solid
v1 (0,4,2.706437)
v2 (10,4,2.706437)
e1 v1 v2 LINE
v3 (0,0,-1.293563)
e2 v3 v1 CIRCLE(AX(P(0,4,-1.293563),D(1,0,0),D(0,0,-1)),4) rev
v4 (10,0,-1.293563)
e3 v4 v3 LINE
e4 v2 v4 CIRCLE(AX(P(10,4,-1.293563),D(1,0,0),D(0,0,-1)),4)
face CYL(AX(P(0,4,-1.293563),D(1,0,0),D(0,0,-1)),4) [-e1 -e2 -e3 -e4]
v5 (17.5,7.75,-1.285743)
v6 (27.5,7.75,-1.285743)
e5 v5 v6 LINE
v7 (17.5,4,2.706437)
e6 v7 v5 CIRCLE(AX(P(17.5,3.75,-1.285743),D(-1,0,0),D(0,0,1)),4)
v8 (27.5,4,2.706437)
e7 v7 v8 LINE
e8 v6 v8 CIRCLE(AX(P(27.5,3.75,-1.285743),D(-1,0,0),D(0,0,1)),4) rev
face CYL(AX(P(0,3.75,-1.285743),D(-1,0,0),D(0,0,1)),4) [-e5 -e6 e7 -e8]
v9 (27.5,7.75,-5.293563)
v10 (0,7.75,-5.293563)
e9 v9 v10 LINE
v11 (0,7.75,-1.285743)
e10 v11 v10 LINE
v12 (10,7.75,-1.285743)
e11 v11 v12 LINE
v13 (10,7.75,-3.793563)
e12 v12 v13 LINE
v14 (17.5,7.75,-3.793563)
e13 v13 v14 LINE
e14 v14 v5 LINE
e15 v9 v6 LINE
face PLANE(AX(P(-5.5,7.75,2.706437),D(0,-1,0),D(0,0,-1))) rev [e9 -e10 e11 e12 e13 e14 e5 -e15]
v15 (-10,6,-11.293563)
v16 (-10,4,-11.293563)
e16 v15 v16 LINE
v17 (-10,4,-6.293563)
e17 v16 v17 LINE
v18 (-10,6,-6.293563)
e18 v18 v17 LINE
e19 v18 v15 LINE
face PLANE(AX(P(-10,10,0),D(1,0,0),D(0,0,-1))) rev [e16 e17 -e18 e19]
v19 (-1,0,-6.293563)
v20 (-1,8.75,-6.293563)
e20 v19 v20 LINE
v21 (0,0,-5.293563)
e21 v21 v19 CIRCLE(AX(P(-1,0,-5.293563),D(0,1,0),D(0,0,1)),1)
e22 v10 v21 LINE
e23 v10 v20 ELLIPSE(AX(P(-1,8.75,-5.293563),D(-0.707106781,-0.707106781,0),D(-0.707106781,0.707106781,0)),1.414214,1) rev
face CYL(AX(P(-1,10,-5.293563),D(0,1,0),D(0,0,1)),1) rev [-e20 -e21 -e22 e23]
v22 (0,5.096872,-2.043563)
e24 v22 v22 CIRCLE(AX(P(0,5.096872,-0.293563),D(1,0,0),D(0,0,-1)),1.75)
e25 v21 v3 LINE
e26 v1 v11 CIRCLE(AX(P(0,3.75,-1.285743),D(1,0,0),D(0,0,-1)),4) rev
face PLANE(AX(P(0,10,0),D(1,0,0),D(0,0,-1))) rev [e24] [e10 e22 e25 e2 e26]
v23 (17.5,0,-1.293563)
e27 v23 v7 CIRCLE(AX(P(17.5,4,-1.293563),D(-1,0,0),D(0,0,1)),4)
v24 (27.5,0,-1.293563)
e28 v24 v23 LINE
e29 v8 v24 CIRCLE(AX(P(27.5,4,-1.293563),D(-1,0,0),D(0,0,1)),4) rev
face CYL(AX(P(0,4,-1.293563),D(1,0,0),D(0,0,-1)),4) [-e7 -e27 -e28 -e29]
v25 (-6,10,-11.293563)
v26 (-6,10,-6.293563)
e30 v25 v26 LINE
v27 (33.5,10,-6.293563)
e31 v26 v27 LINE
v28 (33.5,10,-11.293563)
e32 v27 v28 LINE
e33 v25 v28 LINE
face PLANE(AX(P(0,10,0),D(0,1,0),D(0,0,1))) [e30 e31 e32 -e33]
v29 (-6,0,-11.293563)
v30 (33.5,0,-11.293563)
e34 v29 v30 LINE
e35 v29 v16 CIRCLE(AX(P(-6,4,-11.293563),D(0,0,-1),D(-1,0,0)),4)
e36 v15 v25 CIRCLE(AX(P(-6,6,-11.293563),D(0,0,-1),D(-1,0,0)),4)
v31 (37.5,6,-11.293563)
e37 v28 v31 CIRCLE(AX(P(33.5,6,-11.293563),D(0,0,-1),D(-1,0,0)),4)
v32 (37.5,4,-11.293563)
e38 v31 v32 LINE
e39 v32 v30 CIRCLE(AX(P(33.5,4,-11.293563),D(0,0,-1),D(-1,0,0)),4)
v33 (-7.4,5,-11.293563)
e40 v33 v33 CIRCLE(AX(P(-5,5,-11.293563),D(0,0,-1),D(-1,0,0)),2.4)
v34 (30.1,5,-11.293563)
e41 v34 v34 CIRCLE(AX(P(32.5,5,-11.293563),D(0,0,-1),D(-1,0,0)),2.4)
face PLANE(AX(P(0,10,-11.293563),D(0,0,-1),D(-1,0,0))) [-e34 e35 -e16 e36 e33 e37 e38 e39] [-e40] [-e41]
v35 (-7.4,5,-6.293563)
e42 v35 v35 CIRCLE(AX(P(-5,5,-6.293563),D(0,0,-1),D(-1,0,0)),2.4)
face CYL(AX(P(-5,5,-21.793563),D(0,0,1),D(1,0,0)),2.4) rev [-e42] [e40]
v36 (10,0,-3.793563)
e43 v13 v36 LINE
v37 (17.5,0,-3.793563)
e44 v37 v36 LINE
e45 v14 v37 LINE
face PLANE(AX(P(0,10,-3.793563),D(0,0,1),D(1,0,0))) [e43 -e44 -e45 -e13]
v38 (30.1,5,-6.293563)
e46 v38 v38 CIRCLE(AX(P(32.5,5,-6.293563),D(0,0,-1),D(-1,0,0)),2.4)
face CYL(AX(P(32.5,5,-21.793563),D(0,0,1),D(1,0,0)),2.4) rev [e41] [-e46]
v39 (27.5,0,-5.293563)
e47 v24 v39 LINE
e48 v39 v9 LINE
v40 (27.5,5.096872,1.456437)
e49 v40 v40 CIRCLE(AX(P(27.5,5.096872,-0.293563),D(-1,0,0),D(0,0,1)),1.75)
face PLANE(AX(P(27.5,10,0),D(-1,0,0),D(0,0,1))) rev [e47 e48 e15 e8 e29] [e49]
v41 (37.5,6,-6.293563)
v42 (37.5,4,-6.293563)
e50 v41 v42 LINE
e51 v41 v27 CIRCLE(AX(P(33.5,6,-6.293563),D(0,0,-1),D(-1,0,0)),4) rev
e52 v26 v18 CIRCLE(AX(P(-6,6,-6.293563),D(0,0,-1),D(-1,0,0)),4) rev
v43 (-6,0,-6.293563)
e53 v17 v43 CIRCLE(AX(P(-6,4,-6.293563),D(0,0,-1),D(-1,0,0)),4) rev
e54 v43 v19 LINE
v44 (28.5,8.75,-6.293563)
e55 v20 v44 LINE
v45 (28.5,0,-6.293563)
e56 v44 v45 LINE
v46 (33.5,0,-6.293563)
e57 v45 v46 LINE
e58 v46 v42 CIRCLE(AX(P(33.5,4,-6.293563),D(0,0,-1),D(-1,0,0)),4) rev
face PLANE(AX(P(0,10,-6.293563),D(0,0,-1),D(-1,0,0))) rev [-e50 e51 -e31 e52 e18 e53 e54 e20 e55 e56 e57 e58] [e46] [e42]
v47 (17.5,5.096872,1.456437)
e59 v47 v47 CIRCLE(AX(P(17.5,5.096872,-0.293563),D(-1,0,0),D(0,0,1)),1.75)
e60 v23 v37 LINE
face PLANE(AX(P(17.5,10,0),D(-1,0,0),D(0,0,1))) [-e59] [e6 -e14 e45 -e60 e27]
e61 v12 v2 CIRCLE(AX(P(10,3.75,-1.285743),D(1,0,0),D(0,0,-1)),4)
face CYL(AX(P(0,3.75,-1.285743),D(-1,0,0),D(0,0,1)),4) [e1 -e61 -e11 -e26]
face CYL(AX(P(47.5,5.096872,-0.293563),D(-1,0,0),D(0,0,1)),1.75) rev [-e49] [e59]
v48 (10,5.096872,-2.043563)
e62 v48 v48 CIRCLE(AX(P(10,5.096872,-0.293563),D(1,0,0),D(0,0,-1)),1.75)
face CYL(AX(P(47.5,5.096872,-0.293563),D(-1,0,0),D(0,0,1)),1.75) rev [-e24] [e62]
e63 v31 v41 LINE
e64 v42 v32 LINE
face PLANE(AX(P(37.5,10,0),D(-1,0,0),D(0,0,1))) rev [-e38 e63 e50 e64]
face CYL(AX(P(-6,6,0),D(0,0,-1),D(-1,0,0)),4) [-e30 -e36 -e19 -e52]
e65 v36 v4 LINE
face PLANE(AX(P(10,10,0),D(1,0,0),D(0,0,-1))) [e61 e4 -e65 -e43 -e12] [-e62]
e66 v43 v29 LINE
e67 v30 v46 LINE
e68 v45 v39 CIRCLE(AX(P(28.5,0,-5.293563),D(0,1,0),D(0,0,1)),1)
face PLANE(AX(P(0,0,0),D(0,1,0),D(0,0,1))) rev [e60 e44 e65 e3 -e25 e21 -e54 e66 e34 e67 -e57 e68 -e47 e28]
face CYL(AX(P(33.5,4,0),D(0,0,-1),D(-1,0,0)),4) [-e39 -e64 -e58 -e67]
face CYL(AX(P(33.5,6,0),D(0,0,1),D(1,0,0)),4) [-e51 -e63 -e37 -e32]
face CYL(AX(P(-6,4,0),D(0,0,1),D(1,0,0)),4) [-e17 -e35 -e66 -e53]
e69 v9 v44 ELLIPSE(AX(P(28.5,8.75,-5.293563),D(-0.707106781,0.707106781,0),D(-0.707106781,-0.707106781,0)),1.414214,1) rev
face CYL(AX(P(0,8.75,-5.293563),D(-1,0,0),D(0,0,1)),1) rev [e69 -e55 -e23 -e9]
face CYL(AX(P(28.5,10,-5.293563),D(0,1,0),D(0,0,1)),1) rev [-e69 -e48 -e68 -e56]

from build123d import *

# Parameters (mm, degrees)
BOSS_EXTRUDE1_DEPTH = 10
SKETCH2_R           = 1.75
CUT_EXTRUDE1_DEPTH  = 30
SKETCH3_R           = 2.4
CUT_EXTRUDE2_DEPTH  = 15.5
FILLET2_R           = 4
FILLET3_R           = 4
SKETCH5_W           = 9
SKETCH5_H           = 2.25
CUT_EXTRUDE3_DEPTH  = 33
FILLET4_R           = 4
FILLET5_R           = 1


with BuildPart() as part:
    # Sketch1 → Boss-Extrude1 (new body)
    with BuildSketch(Plane(origin=(0, 0, 0), x_dir=(1, 0, 0), z_dir=(0, 1, 0))):
        Polygon((17.5, -2.706437242), (27.5, -2.706437242), (27.5, 6.293562758), (37.5, 6.293562758), (37.5, 11.293562758), (-10, 11.293562758), (-10, 6.293562758), (0, 6.293562758), (0, 0), (0, -2.706437242), (10, -2.706437242), (10, 3.793562758), (17.5, 3.793562758), align=None)
    extrude(amount=BOSS_EXTRUDE1_DEPTH)

    # Sketch2 → Cut-Extrude1 (cut, symmetric)
    with BuildSketch(Plane.ZY.offset(-17.5)):
        with Locations((-0.293562758, 5.096871602)):
            Circle(SKETCH2_R)
    extrude(amount=CUT_EXTRUDE1_DEPTH, both=True, mode=Mode.SUBTRACT)

    # Sketch3 → Cut-Extrude2 (cut, symmetric)
    with BuildSketch(Plane.XY.offset(-6.293562758)):
        with Locations(Location((-5, 5, 0), (0, 0, 180))):
            Circle(SKETCH3_R)
        with Locations(Location((32.5, 5, 0), (0, 0, 180))):
            Circle(SKETCH3_R)
    extrude(amount=CUT_EXTRUDE2_DEPTH, both=True, mode=Mode.SUBTRACT)

    # Fillet2
    fillet2_edges = [part.edges().sort_by_distance(p)[0] for p in [
        (22.5, 0, 2.706437242),
        (5, 0, 2.706437242),
    ]]
    fillet(fillet2_edges, radius=FILLET2_R)

    # Fillet3
    fillet3_edges = [part.edges().sort_by_distance(p)[0] for p in [
        (37.5, 10, -8.793562758),
        (-10, 0, -8.793562758),
        (37.5, 0, -8.793562758),
        (-10, 10, -8.793562758),
    ]]
    fillet(fillet3_edges, radius=FILLET3_R)

    # Sketch5 → Cut-Extrude3 (cut, symmetric)
    with BuildSketch(Plane(origin=(27.5, 0, 0), x_dir=(0, 0, -1), z_dir=(1, 0, 0))):
        with Locations((1.793562758, 8.875)):
            Rectangle(SKETCH5_W, SKETCH5_H)
    extrude(amount=CUT_EXTRUDE3_DEPTH, both=True, mode=Mode.SUBTRACT)

    # Fillet4
    # the kernel refuses this fillet: 4 mm, written as the material it takes off along each edge
    with BuildSketch(Plane(origin=(7.519550361, 7.75, 2.706437242), x_dir=(0, 0, -1), z_dir=(1, 0, 0))) as fillet4_piece_1:
        with BuildLine():
            CenterArc((3.992179856, -4), FILLET4_R, 90, 86.416678302)
            Line((0, -3.75), (-0.079843597, -3.745))
            ThreePointArc((-0.079843597, -3.745), (-0.08, -1.875), (-0.08, 0))
            Line((-0.08, 0), (0, 0.08))
            Line((0, 0.08), (3.992179856, 0.08))
            Line((3.992179856, 0.08), (3.992179856, 0))
        make_face()
    extrude(amount=29.960899278, mode=Mode.SUBTRACT)
    with BuildSketch(Plane(origin=(-9.980449639, 7.75, 2.706437242), x_dir=(0, -1, 0), z_dir=(1, 0, 0))) as fillet4_piece_2:
        with BuildLine():
            CenterArc((4, 3.992179856), FILLET4_R, 180, 86.416678302)
            Line((0, 3.992179856), (-0.08, 3.992179856))
            Line((-0.08, 3.992179856), (-0.08, 0))
            Line((-0.08, 0), (0, -0.08))
            ThreePointArc((0, -0.08), (1.875, -0.08), (3.745, -0.079843597))
            Line((3.745, -0.079843597), (3.75, 0))
        make_face()
    extrude(amount=29.960899278, mode=Mode.SUBTRACT)

    # Fillet5
    fillet5_edges = [part.edges().sort_by_distance(p)[0] for p in [
        (27.5, 3.875, -6.293562758),
        (0, 3.875, -6.293562758),
        (13.75, 7.75, -6.293562758),
    ]]
    fillet(fillet5_edges, radius=FILLET5_R)


solid = part.part
